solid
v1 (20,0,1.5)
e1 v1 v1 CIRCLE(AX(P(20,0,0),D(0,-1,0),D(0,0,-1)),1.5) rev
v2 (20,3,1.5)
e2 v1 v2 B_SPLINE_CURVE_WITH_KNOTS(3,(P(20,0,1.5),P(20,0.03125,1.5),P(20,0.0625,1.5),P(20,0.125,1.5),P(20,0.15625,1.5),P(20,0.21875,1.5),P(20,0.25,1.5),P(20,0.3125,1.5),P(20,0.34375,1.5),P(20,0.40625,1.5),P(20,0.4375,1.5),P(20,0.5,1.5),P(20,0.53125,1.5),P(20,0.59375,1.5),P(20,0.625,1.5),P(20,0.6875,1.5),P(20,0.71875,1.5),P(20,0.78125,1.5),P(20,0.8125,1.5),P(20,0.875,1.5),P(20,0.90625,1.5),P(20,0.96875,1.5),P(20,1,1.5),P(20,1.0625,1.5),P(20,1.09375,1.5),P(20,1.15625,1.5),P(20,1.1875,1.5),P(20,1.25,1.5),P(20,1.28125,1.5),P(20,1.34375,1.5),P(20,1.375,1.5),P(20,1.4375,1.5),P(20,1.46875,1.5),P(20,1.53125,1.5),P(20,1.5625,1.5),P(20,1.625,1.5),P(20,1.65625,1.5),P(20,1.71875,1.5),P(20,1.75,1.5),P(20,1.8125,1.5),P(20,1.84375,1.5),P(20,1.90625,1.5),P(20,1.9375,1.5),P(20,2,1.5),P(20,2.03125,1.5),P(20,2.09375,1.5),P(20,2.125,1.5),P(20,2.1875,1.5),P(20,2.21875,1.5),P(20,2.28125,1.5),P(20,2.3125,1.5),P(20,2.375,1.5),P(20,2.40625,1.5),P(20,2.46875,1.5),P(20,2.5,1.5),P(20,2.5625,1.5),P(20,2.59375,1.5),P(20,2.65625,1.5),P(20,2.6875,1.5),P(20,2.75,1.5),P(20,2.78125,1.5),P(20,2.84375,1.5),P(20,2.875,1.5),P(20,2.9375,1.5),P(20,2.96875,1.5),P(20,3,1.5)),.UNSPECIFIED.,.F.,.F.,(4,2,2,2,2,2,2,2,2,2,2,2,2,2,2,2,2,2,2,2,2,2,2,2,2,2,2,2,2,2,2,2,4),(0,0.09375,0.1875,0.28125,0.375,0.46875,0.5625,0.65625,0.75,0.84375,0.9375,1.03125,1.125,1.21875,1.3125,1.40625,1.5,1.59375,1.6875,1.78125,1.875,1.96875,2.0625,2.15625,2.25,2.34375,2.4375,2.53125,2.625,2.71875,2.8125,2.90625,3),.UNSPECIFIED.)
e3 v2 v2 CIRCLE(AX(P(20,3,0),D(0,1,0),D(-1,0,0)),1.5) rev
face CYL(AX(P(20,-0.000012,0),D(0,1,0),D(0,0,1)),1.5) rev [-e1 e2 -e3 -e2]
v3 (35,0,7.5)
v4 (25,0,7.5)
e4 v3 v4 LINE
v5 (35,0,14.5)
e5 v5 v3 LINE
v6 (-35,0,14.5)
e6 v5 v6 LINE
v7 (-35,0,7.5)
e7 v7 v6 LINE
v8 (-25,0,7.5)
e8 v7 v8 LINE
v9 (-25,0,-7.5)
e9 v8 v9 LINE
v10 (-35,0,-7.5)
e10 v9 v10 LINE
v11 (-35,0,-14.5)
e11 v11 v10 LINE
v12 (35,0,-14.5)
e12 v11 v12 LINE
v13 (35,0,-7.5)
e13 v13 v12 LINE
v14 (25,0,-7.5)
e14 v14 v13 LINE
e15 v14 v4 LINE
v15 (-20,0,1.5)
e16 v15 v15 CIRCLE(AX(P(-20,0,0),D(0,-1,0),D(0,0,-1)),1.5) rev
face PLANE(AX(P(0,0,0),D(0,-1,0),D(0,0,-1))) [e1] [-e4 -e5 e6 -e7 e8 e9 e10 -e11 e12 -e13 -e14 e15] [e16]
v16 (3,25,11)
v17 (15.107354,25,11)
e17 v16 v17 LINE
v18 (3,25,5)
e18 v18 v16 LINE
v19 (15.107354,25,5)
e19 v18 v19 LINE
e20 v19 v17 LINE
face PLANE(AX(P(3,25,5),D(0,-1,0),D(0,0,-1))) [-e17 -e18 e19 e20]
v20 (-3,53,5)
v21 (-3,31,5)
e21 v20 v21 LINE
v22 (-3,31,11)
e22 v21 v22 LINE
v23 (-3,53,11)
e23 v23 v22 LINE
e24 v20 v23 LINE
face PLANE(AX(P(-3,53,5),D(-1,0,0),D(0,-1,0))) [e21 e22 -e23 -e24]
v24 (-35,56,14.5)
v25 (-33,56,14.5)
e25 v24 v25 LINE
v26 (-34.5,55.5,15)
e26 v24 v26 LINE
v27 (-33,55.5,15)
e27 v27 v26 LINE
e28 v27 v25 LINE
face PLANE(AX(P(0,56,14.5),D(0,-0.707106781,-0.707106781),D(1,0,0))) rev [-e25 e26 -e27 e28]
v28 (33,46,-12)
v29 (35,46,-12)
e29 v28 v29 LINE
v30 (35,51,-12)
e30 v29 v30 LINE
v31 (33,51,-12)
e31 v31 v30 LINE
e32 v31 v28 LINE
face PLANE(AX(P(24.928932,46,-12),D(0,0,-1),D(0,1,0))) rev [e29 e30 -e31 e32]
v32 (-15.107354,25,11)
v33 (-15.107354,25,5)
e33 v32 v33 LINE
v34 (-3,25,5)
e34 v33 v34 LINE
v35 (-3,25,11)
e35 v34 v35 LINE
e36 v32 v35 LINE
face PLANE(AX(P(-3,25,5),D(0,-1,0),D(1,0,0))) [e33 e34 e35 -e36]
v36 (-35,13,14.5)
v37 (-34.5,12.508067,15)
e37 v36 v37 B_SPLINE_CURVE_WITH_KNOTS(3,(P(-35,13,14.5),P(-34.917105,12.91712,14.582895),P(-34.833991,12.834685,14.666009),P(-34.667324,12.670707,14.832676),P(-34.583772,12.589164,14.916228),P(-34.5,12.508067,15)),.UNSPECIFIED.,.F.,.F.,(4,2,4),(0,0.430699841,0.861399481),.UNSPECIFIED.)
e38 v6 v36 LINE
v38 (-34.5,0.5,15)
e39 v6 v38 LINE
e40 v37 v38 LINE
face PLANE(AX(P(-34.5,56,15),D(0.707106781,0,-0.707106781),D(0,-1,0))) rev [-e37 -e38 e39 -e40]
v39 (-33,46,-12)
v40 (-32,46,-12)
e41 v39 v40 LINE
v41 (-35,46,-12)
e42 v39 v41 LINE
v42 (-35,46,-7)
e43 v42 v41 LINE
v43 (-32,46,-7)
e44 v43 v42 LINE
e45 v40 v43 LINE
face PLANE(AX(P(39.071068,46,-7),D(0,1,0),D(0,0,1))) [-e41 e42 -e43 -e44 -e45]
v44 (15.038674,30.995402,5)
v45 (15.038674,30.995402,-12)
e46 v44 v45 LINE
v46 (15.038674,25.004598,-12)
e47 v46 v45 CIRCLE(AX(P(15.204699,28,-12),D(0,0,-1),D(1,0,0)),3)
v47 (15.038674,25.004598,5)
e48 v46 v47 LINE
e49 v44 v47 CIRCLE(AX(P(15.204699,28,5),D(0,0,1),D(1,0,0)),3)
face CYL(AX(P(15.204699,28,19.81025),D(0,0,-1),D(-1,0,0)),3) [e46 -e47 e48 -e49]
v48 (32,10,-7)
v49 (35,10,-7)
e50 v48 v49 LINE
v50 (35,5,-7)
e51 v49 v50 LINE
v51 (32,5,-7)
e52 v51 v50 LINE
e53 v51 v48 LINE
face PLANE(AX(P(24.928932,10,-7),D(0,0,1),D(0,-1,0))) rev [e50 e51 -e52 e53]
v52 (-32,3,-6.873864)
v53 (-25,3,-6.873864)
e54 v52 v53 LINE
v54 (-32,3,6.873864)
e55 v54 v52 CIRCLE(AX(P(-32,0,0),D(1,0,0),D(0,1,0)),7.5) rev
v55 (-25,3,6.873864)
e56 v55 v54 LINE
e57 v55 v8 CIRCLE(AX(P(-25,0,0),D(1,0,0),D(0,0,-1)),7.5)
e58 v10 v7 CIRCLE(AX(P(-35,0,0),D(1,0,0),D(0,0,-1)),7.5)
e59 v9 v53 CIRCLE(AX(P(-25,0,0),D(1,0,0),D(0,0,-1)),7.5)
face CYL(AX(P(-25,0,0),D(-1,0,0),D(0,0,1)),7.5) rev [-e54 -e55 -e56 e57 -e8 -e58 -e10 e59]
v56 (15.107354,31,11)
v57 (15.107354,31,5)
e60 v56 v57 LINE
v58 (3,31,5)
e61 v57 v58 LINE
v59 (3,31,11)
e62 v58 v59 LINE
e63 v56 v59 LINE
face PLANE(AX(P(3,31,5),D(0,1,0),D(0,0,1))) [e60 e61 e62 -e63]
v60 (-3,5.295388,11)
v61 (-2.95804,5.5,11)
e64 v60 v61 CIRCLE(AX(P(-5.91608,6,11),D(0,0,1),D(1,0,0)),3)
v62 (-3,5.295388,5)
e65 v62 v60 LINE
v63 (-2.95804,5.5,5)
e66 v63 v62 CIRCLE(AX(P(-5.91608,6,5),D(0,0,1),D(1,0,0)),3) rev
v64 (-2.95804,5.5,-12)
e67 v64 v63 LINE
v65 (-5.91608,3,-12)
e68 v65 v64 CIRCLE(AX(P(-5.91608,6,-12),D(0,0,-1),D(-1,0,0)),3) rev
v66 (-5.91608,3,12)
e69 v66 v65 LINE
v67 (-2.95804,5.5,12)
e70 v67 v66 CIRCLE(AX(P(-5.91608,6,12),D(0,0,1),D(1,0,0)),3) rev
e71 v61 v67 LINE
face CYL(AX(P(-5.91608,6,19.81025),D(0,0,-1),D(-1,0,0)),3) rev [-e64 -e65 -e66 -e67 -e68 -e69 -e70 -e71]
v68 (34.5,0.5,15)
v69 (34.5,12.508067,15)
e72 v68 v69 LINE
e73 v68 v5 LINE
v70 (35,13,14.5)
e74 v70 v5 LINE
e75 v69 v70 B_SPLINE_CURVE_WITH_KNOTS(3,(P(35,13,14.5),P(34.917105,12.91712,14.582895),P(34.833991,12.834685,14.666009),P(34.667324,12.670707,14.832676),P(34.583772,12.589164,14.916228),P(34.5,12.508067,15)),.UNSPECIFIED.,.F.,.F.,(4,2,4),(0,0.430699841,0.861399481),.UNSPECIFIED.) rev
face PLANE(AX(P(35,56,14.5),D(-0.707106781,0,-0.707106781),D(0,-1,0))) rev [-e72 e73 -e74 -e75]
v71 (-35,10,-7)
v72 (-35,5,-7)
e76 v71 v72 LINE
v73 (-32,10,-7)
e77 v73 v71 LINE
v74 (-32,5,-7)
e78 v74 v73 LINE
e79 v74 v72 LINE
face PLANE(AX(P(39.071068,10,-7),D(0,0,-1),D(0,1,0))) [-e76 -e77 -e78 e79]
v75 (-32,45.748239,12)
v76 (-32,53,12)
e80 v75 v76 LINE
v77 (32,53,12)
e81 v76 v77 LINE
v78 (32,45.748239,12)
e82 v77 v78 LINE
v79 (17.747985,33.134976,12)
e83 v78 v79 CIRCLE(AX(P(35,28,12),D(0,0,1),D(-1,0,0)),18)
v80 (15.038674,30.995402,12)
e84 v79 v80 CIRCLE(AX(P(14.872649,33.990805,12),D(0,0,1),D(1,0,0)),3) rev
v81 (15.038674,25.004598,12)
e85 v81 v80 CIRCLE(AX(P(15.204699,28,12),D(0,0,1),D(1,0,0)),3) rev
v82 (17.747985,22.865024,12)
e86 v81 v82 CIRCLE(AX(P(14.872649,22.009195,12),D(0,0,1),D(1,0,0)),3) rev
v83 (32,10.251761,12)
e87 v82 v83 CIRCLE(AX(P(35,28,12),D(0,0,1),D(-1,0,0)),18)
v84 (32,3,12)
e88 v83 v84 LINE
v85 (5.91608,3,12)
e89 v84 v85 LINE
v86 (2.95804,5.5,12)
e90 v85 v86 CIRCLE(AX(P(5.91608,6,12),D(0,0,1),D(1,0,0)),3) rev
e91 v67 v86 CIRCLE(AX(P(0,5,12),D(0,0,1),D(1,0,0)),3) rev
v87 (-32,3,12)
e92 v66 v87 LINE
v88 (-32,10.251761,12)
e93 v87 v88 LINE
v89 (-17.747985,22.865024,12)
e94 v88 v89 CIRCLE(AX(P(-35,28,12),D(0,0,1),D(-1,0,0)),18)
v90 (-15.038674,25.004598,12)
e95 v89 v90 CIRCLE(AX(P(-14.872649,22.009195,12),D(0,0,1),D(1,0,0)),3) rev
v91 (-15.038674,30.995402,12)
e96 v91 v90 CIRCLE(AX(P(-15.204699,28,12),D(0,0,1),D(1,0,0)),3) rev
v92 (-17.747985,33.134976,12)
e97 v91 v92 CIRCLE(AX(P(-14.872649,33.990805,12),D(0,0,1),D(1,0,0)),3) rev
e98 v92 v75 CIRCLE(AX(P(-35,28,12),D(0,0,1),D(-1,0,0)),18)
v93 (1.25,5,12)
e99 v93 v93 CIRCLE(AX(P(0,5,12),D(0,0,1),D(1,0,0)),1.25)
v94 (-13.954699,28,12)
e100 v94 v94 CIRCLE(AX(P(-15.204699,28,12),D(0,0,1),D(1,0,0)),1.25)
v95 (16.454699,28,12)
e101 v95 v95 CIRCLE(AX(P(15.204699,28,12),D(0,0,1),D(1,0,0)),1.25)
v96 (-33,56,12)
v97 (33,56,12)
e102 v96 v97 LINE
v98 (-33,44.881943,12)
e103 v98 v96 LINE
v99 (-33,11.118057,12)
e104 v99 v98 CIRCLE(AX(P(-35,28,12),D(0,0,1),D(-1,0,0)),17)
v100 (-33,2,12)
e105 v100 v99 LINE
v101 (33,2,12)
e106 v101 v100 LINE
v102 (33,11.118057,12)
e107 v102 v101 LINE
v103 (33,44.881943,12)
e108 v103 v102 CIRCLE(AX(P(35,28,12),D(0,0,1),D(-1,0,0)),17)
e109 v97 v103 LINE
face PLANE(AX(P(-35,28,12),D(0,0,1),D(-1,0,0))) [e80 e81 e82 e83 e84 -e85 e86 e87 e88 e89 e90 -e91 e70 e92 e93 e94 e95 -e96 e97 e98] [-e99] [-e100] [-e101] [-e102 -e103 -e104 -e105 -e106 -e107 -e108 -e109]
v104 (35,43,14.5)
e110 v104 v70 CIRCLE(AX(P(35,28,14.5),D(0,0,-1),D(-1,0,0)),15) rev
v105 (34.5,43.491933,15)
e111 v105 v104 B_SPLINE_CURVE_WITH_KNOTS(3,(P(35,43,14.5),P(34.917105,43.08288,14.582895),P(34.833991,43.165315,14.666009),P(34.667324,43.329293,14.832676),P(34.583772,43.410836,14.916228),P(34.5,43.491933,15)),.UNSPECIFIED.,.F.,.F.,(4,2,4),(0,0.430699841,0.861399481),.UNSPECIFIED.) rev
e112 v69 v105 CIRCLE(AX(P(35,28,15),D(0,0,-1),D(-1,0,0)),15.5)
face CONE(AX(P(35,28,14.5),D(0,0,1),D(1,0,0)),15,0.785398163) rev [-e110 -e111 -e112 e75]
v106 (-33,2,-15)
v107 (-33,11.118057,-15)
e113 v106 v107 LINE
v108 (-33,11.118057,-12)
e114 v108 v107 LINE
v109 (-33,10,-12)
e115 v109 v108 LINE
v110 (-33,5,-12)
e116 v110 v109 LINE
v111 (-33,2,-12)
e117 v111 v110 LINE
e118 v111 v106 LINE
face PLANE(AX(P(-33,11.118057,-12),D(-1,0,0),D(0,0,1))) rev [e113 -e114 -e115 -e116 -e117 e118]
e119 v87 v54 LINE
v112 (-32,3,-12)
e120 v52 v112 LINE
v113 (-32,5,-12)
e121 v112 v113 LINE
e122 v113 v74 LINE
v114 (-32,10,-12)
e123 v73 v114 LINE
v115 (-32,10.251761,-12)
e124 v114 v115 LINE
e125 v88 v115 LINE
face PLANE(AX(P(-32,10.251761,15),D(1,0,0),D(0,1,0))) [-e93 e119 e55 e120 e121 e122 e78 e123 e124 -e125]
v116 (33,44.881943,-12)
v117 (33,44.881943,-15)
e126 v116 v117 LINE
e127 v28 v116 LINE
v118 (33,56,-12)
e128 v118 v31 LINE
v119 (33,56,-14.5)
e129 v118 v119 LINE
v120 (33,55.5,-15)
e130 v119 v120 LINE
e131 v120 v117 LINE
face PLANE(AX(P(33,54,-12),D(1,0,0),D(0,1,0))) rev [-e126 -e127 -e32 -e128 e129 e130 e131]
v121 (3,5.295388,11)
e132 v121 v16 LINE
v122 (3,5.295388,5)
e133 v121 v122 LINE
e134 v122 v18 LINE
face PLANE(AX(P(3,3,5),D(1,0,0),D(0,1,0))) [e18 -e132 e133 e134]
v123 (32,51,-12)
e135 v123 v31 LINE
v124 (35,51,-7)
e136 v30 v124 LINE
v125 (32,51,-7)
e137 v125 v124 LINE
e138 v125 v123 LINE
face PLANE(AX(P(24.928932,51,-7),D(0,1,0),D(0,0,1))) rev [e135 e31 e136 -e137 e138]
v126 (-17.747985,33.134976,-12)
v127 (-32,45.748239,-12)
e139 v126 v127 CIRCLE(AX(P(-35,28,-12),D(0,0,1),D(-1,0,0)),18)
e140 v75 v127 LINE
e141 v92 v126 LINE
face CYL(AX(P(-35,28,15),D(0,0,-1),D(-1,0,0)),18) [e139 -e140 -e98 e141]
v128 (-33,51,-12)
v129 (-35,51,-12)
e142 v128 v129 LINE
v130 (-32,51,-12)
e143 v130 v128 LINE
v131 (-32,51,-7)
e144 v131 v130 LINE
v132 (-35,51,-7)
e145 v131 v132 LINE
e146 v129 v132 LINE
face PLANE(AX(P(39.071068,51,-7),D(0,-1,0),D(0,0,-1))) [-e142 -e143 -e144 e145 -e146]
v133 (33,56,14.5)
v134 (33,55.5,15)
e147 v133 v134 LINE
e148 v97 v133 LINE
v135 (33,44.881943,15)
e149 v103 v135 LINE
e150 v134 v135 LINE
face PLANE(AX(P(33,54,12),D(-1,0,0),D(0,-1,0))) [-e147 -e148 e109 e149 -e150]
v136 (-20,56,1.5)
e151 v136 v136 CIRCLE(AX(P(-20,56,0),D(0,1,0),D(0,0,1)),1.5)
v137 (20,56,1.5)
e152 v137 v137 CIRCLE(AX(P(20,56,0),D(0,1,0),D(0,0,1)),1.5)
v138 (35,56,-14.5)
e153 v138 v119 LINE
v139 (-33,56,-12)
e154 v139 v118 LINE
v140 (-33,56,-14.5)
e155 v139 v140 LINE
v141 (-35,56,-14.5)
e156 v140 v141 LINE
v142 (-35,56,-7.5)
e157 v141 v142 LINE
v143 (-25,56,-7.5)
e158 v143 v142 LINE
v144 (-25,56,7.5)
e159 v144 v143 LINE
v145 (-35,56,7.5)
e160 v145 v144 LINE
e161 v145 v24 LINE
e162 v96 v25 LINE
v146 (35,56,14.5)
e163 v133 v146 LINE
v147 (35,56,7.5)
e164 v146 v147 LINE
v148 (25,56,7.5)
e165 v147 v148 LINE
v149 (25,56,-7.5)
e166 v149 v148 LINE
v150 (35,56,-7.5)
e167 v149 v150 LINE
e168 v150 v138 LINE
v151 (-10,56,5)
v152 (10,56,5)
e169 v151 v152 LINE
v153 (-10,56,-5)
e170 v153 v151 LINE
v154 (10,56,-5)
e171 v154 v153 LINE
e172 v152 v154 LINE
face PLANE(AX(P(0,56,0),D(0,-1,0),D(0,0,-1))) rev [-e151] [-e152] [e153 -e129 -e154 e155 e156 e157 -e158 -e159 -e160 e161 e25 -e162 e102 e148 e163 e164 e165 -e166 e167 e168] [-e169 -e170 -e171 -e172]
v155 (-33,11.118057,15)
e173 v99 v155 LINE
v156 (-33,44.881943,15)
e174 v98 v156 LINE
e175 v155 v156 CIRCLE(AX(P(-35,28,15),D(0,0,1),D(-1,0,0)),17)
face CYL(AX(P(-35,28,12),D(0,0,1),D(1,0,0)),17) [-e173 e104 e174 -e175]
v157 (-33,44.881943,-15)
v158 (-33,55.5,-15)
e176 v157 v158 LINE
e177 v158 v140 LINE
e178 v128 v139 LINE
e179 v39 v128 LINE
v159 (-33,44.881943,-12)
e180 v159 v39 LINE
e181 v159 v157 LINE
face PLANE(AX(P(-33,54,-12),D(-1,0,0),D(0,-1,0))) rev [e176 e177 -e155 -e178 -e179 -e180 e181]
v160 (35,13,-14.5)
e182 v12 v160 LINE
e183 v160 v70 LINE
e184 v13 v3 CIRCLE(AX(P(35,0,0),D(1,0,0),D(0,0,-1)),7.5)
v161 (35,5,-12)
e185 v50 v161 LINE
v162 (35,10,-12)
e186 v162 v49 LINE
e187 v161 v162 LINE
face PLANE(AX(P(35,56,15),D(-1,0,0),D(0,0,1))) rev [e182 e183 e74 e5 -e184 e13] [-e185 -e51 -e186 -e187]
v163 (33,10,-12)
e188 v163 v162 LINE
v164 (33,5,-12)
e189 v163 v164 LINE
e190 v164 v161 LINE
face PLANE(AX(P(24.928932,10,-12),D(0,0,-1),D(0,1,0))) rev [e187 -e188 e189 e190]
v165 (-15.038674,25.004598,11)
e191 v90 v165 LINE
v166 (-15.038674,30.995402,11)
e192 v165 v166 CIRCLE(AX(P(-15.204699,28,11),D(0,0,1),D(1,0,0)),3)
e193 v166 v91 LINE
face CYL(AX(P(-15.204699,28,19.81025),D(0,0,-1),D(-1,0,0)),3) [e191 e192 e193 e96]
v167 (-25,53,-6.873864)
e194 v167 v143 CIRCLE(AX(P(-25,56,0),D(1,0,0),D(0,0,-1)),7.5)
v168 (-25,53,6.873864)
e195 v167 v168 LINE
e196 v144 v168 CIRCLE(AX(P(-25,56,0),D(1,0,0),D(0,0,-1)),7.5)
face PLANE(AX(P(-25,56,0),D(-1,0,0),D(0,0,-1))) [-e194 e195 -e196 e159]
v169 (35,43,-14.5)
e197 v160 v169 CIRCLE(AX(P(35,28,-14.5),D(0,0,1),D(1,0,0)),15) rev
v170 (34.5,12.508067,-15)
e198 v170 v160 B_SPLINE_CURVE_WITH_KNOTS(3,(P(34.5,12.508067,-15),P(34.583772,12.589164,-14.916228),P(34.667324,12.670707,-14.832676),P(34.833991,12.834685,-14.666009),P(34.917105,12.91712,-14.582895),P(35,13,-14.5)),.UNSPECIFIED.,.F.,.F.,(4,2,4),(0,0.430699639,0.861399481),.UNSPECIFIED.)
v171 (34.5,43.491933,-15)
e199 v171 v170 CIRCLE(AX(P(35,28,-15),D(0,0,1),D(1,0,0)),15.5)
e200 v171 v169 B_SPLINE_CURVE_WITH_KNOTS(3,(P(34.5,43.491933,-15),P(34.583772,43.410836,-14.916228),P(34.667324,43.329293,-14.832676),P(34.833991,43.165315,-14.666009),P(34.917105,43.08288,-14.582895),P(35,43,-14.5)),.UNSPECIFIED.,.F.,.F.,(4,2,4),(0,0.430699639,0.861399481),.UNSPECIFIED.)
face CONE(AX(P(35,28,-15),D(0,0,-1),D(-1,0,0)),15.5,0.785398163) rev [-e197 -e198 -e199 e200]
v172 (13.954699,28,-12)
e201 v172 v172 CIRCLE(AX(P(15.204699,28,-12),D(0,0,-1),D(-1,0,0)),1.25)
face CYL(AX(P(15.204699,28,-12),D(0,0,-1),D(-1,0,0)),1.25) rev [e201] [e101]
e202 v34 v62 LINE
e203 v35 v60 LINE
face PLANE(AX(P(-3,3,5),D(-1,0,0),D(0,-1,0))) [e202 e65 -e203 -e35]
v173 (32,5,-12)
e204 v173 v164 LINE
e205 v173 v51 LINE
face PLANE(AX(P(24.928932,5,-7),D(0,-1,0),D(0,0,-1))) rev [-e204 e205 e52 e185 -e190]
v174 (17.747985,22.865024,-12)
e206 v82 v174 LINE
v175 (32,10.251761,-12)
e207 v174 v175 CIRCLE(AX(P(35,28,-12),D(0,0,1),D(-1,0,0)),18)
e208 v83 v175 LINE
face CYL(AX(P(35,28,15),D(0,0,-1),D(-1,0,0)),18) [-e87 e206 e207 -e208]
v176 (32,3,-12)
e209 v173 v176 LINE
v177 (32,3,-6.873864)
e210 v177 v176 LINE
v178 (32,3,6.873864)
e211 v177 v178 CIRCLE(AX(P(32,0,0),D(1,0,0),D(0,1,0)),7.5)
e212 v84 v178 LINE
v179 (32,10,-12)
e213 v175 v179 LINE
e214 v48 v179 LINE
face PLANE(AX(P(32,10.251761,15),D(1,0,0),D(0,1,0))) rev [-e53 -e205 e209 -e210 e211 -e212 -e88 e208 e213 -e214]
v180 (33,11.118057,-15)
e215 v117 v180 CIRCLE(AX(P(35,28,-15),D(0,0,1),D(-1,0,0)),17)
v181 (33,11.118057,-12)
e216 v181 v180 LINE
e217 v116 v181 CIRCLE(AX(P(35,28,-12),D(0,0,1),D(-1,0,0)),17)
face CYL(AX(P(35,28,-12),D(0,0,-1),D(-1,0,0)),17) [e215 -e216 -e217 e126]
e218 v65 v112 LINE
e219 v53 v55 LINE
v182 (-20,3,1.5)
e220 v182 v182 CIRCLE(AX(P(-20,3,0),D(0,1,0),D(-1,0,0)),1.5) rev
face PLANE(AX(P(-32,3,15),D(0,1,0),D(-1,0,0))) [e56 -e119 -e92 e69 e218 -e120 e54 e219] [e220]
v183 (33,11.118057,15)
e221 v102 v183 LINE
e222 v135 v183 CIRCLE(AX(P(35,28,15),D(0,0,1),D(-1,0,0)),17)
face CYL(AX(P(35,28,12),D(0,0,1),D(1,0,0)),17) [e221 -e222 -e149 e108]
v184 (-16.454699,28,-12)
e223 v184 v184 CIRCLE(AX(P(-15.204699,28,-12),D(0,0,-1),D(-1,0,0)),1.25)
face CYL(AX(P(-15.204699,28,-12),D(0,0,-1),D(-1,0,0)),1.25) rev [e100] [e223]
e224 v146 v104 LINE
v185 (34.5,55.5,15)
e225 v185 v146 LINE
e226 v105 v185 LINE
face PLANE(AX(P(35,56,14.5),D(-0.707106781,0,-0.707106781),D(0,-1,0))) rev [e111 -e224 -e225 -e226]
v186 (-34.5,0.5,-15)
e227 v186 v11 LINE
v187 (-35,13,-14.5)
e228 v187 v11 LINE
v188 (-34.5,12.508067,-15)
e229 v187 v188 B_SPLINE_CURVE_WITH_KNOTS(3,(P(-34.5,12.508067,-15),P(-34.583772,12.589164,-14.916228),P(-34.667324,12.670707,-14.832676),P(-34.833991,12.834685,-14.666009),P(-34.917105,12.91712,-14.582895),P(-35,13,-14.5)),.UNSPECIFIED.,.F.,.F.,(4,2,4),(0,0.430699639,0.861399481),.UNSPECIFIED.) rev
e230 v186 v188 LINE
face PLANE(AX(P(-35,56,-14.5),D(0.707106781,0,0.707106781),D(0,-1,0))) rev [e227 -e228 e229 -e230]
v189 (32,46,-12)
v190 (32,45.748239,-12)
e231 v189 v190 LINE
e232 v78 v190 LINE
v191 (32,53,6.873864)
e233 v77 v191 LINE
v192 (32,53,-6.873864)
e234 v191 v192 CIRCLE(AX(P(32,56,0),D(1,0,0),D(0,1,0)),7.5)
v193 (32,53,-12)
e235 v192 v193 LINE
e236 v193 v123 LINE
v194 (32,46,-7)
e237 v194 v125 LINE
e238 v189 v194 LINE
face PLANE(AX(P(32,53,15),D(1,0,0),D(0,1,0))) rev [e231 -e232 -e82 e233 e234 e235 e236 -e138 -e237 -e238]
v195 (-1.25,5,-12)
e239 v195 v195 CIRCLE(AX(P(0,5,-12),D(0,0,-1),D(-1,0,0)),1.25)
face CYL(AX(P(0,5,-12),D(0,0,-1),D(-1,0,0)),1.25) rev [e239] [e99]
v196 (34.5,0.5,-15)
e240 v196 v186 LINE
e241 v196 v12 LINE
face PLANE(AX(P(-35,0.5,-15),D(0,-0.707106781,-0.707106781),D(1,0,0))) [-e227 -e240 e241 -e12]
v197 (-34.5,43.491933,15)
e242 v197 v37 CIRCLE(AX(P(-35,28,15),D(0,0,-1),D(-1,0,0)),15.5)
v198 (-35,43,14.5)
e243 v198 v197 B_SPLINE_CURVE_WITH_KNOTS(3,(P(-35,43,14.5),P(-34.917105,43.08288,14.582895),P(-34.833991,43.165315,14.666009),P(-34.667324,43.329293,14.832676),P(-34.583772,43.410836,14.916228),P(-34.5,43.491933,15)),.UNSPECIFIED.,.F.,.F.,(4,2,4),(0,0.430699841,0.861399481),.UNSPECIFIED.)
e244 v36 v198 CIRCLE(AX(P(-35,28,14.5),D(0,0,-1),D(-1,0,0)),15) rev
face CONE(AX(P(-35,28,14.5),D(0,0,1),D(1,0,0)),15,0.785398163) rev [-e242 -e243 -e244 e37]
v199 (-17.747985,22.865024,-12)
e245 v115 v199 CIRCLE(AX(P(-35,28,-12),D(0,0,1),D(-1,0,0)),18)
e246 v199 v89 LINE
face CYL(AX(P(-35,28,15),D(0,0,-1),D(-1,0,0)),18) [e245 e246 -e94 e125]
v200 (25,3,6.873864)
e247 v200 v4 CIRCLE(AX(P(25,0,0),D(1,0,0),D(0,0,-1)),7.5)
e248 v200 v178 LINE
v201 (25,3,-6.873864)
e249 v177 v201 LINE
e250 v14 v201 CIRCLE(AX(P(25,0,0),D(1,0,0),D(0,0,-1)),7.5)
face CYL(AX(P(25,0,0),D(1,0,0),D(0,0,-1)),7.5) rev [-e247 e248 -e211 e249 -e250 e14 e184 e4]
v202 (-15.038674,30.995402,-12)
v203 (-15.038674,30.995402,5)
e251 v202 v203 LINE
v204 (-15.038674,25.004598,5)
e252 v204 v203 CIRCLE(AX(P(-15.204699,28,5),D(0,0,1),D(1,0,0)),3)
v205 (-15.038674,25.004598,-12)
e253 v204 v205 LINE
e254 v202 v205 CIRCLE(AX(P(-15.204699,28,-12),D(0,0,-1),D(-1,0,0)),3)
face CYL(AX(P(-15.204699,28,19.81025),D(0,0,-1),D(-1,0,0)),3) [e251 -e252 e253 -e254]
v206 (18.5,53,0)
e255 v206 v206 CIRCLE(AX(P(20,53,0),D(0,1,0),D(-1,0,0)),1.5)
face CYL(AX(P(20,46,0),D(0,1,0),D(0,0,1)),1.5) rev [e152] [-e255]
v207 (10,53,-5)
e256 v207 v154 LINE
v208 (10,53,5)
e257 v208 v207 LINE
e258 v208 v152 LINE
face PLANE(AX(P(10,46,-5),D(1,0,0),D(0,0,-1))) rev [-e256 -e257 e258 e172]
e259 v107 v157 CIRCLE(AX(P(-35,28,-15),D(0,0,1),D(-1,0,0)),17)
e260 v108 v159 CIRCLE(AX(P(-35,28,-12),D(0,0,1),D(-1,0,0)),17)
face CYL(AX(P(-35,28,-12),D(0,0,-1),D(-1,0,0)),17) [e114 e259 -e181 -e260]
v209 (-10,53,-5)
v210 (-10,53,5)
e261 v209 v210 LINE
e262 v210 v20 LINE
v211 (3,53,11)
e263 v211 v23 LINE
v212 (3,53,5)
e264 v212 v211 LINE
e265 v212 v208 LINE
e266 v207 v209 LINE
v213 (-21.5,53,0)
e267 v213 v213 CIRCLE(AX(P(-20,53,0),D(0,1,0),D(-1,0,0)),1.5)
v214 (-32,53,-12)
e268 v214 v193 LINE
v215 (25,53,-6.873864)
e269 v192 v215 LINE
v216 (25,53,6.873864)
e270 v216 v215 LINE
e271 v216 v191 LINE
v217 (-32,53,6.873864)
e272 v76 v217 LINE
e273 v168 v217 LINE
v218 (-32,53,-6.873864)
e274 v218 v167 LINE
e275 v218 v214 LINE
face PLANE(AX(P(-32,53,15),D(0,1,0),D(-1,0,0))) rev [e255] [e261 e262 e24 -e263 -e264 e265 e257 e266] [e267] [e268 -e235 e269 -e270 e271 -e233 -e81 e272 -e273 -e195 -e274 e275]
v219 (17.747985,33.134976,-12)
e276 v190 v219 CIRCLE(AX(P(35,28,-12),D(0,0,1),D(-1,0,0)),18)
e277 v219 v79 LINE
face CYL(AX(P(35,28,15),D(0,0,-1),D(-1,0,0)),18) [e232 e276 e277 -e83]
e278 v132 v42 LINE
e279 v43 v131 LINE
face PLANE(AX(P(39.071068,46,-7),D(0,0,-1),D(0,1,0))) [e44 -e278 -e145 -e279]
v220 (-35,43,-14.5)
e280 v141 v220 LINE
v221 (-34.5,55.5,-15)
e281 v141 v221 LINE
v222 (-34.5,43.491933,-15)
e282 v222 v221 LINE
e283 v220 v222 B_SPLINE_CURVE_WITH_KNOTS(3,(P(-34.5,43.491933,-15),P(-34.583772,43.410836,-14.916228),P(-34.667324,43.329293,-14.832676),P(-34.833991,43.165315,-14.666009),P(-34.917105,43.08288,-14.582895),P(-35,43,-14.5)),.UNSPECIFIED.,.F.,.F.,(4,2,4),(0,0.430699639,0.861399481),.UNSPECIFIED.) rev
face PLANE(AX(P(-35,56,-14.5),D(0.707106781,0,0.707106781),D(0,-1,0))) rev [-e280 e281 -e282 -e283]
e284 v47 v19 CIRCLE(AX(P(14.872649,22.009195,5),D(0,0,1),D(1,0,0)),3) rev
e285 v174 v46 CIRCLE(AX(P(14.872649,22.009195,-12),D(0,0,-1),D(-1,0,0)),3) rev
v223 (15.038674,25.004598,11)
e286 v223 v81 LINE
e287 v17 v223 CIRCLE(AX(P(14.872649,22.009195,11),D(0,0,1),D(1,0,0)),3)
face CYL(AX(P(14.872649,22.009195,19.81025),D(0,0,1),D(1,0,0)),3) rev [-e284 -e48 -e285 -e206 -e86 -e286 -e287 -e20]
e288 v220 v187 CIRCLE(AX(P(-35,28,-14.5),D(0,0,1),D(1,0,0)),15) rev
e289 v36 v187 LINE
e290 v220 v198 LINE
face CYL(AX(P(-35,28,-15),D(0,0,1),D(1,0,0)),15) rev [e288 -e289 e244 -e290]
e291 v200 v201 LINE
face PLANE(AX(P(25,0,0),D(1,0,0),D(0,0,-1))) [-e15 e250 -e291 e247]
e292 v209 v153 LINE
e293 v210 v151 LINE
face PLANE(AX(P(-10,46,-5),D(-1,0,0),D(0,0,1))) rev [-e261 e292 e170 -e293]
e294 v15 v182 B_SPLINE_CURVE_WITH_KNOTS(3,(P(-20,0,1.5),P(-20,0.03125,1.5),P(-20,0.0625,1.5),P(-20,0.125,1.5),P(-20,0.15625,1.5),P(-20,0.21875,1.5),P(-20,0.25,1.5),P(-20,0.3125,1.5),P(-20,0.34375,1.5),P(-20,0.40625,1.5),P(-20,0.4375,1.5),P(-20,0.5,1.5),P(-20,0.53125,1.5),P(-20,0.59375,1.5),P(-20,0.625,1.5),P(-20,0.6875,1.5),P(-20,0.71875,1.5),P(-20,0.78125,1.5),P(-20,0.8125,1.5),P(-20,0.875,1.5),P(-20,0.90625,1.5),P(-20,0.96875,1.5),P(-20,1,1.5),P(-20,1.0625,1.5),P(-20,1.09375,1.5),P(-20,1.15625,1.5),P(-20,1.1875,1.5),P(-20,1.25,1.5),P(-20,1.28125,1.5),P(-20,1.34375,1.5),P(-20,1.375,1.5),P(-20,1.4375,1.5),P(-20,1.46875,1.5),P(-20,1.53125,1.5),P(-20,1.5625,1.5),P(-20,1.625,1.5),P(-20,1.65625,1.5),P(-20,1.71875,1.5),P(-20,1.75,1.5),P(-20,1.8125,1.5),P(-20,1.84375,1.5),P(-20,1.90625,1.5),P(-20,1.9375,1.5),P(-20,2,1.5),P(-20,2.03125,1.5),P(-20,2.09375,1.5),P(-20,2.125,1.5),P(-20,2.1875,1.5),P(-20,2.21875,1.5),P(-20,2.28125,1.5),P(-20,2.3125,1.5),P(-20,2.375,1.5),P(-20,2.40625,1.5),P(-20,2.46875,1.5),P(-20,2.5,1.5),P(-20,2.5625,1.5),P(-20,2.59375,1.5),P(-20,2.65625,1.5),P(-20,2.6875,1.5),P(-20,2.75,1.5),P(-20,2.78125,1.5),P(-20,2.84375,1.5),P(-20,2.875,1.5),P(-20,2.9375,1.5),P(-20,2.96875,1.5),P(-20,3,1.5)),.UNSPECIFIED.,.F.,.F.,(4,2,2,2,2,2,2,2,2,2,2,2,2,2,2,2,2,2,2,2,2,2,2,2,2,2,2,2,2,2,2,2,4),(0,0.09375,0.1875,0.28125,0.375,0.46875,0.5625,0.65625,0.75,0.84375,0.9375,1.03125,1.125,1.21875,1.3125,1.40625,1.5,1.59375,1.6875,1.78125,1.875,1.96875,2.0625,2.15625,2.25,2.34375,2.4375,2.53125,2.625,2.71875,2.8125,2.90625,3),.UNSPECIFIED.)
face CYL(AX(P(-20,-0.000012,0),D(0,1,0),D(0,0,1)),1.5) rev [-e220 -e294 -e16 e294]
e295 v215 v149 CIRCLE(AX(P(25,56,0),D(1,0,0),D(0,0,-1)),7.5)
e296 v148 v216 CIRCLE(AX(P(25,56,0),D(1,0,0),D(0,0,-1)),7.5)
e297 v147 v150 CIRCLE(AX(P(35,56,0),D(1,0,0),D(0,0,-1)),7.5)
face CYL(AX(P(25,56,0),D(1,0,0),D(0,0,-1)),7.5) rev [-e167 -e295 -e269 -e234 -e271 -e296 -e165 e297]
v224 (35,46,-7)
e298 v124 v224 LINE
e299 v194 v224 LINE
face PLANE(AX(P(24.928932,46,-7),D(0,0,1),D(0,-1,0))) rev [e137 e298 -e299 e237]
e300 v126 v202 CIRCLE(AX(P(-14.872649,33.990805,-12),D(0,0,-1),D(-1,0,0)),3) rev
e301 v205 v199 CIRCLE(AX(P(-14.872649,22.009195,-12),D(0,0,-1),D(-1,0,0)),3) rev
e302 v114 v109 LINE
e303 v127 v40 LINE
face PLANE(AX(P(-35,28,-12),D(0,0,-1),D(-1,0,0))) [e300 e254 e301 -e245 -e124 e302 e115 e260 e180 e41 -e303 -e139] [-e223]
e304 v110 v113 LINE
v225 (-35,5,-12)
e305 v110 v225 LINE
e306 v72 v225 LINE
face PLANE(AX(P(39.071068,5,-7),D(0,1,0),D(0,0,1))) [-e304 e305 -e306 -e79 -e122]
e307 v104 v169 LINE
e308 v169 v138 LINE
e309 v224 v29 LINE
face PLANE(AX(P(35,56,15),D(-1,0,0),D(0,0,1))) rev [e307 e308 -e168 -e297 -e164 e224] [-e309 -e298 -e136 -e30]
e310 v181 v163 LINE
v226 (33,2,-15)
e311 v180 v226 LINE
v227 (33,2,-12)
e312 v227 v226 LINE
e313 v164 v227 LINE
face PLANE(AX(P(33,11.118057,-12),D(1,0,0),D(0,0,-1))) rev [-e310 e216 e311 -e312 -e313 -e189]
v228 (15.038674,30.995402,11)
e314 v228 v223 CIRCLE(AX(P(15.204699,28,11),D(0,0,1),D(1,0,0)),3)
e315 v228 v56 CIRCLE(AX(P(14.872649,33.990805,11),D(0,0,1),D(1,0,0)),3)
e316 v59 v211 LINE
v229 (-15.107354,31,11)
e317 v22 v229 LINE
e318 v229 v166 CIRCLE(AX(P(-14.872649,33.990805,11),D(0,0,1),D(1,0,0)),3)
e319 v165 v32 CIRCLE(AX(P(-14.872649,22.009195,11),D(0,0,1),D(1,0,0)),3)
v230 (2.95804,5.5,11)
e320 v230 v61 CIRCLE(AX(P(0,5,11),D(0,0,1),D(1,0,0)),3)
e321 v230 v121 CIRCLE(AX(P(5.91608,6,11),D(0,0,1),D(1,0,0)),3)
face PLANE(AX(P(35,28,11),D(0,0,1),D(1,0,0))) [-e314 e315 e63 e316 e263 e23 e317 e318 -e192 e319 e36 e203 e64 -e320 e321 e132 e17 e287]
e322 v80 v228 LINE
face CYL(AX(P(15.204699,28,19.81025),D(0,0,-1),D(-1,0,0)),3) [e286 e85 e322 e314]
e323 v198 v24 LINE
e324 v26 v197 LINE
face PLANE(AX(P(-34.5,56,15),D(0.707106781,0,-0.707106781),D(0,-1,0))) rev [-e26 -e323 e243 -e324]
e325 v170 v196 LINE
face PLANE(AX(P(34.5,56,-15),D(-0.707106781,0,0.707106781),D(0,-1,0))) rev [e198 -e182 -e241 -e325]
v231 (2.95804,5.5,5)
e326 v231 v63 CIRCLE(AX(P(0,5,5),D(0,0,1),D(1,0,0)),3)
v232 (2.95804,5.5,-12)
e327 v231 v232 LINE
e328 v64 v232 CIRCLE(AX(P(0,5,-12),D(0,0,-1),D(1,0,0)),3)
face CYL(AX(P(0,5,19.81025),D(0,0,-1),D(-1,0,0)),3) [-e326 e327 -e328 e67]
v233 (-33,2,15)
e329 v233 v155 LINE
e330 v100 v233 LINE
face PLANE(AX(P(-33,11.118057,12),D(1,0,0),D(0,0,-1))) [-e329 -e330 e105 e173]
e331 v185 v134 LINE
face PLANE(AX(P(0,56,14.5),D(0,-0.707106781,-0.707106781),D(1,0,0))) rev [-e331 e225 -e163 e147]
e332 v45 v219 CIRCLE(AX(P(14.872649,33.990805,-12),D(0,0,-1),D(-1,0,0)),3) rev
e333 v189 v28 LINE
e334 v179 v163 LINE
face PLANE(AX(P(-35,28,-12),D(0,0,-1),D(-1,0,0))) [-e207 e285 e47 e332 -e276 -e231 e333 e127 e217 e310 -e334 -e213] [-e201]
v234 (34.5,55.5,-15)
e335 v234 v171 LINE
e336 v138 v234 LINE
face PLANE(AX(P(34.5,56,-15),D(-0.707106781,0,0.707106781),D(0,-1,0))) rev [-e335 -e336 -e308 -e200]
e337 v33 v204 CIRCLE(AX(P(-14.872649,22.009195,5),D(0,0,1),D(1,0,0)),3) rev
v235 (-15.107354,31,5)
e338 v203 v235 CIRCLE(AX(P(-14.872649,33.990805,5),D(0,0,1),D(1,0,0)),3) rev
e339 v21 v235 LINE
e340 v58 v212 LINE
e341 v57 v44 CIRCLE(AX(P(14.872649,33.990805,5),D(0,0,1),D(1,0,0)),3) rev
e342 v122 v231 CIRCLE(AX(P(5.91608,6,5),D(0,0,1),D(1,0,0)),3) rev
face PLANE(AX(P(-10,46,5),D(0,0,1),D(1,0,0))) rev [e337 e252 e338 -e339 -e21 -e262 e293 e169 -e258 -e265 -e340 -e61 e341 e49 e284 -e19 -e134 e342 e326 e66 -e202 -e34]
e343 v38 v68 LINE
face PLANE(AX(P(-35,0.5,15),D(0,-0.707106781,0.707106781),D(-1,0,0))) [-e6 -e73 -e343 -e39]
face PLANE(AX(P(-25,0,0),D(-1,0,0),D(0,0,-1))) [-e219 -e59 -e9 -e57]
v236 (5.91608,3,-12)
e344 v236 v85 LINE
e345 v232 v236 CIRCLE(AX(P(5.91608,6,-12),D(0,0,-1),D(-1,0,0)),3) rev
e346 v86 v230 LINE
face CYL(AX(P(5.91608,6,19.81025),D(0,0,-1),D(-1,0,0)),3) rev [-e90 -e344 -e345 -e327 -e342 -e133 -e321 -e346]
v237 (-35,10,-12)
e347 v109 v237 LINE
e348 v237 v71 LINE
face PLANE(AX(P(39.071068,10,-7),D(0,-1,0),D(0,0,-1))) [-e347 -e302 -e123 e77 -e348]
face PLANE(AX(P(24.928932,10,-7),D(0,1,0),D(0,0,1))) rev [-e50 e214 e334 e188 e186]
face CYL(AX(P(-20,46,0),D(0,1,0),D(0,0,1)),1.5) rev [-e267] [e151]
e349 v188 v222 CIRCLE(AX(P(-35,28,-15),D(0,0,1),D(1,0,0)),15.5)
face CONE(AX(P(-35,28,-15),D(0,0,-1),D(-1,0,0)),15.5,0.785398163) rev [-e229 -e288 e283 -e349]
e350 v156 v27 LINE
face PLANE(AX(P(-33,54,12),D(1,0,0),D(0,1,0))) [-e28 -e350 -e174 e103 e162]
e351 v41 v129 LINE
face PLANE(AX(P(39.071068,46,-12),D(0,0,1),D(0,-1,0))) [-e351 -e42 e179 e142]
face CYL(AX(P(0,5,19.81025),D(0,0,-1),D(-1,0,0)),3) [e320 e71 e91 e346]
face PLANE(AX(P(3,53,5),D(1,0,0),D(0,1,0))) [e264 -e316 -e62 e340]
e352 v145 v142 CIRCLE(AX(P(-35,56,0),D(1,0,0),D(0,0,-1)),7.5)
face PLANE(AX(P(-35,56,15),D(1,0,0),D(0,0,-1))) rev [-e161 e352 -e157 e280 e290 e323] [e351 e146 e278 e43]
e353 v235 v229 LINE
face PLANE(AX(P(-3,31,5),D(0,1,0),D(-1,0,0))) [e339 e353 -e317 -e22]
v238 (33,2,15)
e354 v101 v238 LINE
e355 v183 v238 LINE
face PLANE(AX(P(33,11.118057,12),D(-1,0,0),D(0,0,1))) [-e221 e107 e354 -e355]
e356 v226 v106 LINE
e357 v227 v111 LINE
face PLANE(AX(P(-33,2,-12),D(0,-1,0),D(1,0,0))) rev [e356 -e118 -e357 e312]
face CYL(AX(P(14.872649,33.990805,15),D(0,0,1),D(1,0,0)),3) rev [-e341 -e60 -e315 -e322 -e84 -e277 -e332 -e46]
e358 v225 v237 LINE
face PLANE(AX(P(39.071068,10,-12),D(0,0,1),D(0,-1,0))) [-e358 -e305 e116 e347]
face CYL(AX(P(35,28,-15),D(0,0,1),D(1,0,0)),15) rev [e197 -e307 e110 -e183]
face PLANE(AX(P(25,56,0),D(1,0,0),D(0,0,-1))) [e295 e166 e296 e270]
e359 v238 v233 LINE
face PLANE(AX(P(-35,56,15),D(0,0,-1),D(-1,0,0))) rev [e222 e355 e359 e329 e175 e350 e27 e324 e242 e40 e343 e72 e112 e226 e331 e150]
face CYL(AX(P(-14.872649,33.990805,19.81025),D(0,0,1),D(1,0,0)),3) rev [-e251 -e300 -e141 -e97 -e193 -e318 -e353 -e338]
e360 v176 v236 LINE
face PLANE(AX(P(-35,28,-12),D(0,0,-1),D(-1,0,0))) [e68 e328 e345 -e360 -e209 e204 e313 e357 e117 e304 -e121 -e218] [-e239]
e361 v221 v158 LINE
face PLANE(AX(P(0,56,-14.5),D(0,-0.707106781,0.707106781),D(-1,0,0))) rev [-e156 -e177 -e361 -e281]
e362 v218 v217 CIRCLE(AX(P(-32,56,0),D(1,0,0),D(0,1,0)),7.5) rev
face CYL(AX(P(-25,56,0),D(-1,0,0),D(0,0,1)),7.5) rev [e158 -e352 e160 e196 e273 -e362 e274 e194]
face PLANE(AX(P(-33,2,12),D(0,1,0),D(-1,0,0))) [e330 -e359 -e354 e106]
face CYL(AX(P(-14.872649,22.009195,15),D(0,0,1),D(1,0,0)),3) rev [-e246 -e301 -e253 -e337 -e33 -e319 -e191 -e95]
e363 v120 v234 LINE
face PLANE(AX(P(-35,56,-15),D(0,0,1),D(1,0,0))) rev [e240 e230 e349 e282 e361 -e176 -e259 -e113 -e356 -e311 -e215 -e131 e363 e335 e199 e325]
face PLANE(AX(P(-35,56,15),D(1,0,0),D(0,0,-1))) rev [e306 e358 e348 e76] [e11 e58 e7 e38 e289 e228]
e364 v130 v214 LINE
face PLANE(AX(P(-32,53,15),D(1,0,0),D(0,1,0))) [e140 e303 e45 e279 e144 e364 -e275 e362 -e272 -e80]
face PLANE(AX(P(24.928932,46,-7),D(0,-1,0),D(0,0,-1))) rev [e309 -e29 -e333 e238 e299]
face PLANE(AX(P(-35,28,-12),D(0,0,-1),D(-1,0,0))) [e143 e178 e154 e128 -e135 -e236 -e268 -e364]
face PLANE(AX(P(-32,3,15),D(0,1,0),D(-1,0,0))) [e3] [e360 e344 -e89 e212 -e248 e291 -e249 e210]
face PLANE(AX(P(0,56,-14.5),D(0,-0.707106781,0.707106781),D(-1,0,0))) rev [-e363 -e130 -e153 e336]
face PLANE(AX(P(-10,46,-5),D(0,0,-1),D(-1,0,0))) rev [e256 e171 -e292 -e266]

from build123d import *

# Parameters (mm, degrees)
SKETCH1_W                   = 70
SKETCH1_H                   = 30
BOSS_EXTRUDE1_DEPTH         = 56
CUT_EXTRUDE1_DEPTH          = 73.532751223
CUT_EXTRUDE2_DEPTH          = 68.720011813
CUT_EXTRUDE2_DEPTH_BACK     = 5
SKETCH3_R                   = 1.5
SKETCH4_R                   = 7.5
CUT_EXTRUDE5_DEPTH          = 10
SKETCH6_R                   = 15
CUT_EXTRUDE7_DEPTH          = 73.532751223
SKETCH7_W                   = 20
SKETCH7_H                   = 10
CUT_EXTRUDE8_DEPTH          = 10
CUT_EXTRUDE10_START         = -10
SKETCH8_R                   = 1.5
CUT_EXTRUDE10_DEPTH         = 10
CUT_EXTRUDE11_DEPTH         = 3
BOSS_EXTRUDE2_START         = -10
BOSS_EXTRUDE2_DEPTH         = 6
CHAMFER1_SIZE               = 0.5
CHAMFER2_SIZE               = 0.5
SKETCH10_W                  = 66
SKETCH10_H                  = 2
CUT_EXTRUDE13_DEPTH         = 3
CUT_EXTRUDE14_START         = -3
SKETCH12_W                  = 5
SKETCH12_H                  = 5
CUT_EXTRUDE14_DEPTH         = 3
BOSS_EXTRUDE3_START         = -24
BOSS_EXTRUDE3_DEPTH         = 24
TAP_DRILL_FOR_M3X0_5_TAP1_D = 2.5
FILLET1_R                   = 3


with BuildPart() as part:
    # Sketch1 → Boss-Extrude1 (new body)
    with BuildSketch(Plane(origin=(0, 0, 0), x_dir=(1, 0, 0), z_dir=(0, 1, 0))):
        Rectangle(SKETCH1_W, SKETCH1_H)
    extrude(amount=BOSS_EXTRUDE1_DEPTH)

    # Sketch2 → Cut-Extrude1 (cut, through all)
    with BuildSketch(Plane(origin=(0, 0, -15), x_dir=(-1, 0, 0), z_dir=(0, 0, -1))):
        with BuildLine():
            Line((32, 53), (-32, 53))
            Line((-32, 53), (-32, 45.748239349))
            ThreePointArc((-32, 45.748239349), (-17, 28), (-32, 10.251760651))
            Line((-32, 10.251760651), (-32, 3))
            Line((-32, 3), (32, 3))
            Line((32, 3), (32, 10.251760651))
            ThreePointArc((32, 10.251760651), (17, 28), (32, 45.748239349))
            Line((32, 45.748239349), (32, 53))
        make_face()
    extrude(amount=-CUT_EXTRUDE1_DEPTH, mode=Mode.SUBTRACT)

    # Sketch3 → Cut-Extrude2 (cut, two sides: drawn at the far end of the back side and taken through both)
    with BuildSketch(Plane.XZ.offset(-CUT_EXTRUDE2_DEPTH_BACK)):
        with Locations(Location((20, 0, 0), (0, 0, 90))):
            Circle(SKETCH3_R)
        with Locations(Location((-20, 0, 0), (0, 0, 90))):
            Circle(SKETCH3_R)
    extrude(amount=CUT_EXTRUDE2_DEPTH + CUT_EXTRUDE2_DEPTH_BACK, mode=Mode.SUBTRACT)

    # Sketch4 → Cut-Extrude5 (cut)
    with BuildSketch(Plane(origin=(35, 0, 0), x_dir=(0, 0, -1), z_dir=(1, 0, 0))):
        with Locations((0, 56)):
            Circle(SKETCH4_R)
        Circle(SKETCH4_R)
    cut_extrude5 = extrude(amount=-CUT_EXTRUDE5_DEPTH, mode=Mode.SUBTRACT)

    # Sketch6 → Cut-Extrude7 (cut, through all)
    with BuildSketch(Plane.XY.offset(15)):
        with Locations((-35, 28)):
            Circle(SKETCH6_R)
        with Locations((35, 28)):
            Circle(SKETCH6_R)
    extrude(amount=-CUT_EXTRUDE7_DEPTH, mode=Mode.SUBTRACT)

    # Sketch7 → Cut-Extrude8 (cut)
    with BuildSketch(Plane(origin=(0, 56, 0), x_dir=(1, 0, 0), z_dir=(0, 1, 0))):
        Rectangle(SKETCH7_W, SKETCH7_H)
    extrude(amount=-CUT_EXTRUDE8_DEPTH, mode=Mode.SUBTRACT)

    # Sketch8 → Cut-Extrude10 (cut)
    with BuildSketch(Plane(origin=(0, 56, 0), x_dir=(1, 0, 0), z_dir=(0, 1, 0)).offset(CUT_EXTRUDE10_START)):
        with Locations(Location((20, 0, 0), (0, 0, 270))):
            Circle(SKETCH8_R)
        with Locations(Location((-20, 0, 0), (0, 0, 270))):
            Circle(SKETCH8_R)
    extrude(amount=CUT_EXTRUDE10_DEPTH, mode=Mode.SUBTRACT)

    # Sketch2<3> → Cut-Extrude11 (cut)
    with BuildSketch(Plane(origin=(0, 0, -15), x_dir=(-1, 0, 0), z_dir=(0, 0, -1))):
        with BuildLine():
            Line((-33, 54), (-33, 44.881943016))
            ThreePointArc((-33, 44.881943016), (-18, 28), (-33, 11.118056984))
            Line((-33, 11.118056984), (-33, 2))
            Line((-33, 2), (33, 2))
            Line((33, 2), (33, 11.118056984))
            ThreePointArc((33, 11.118056984), (18, 28), (33, 44.881943016))
            Line((33, 44.881943016), (33, 54))
            Line((33, 54), (-33, 54))
        make_face()
        with BuildLine():
            Line((32, 53), (-32, 53))
            Line((-32, 53), (-32, 45.748239349))
            ThreePointArc((-32, 45.748239349), (-17, 28), (-32, 10.251760651))
            Line((-32, 10.251760651), (-32, 3))
            Line((-32, 3), (32, 3))
            Line((32, 3), (32, 10.251760651))
            ThreePointArc((32, 10.251760651), (17, 28), (32, 45.748239349))
            Line((32, 45.748239349), (32, 53))
        make_face(mode=Mode.SUBTRACT)
    cut_extrude11 = extrude(amount=-CUT_EXTRUDE11_DEPTH, mode=Mode.SUBTRACT)

    # Sketch11 → Boss-Extrude2 (add)
    with BuildSketch(Plane.XY.offset(15).offset(BOSS_EXTRUDE2_START)):
        with BuildLine():
            Line((-3, 3), (3, 3))
            Line((3, 3), (3, 25))
            Line((3, 25), (17.251760651, 25))
            ThreePointArc((17.251760651, 25), (17, 28), (17.251760651, 31))
            Line((17.251760651, 31), (3, 31))
            Line((3, 31), (3, 53))
            Line((3, 53), (-3, 53))
            Line((-3, 53), (-3, 31))
            Line((-3, 31), (-17.251760651, 31))
            ThreePointArc((-17.251760651, 31), (-17, 28), (-17.251760651, 25))
            Line((-17.251760651, 25), (-3, 25))
            Line((-3, 25), (-3, 3))
        make_face()
    extrude(amount=BOSS_EXTRUDE2_DEPTH)

    # Chamfer1
    chamfer1_edges = [part.edges().sort_by_distance(p)[0] for p in [
        (0, 56, 15),
        (32, 6.625880325, 15),
        (32, 49.374119675, 15),
        (0, 53, 15),
        (-32, 49.374119675, 15),
        (-17, 28, 15),
        (-32, 6.625880325, 15),
        (0, 3, 15),
        (17, 28, 15),
        (0, 0, 15),
        (35, 49.5, 15),
        (-35, 49.5, 15),
        (-35, 6.5, 15),
        (35, 6.5, 15),
        (-20, 28, 15),
        (20, 28, 15),
    ]]
    chamfer(chamfer1_edges, length=CHAMFER1_SIZE)

    # Chamfer2
    chamfer2_edges = [part.edges().sort_by_distance(p)[0] for p in [
        (0, 0, -15),
        (0, 56, -15),
        (-35, 49.5, -15),
        (35, 49.5, -15),
        (-35, 6.5, -15),
        (35, 6.5, -15),
        (-20, 28, -15),
        (20, 28, -15),
    ]]
    chamfer(chamfer2_edges, length=CHAMFER2_SIZE)

    # Sketch10 → Cut-Extrude13 (cut)
    with BuildSketch(Plane(origin=(0, 0, -15), x_dir=(-1, 0, 0), z_dir=(0, 0, -1))):
        with Locations((0, 55)):
            Rectangle(SKETCH10_W, SKETCH10_H)
    cut_extrude13 = extrude(amount=-CUT_EXTRUDE13_DEPTH, mode=Mode.SUBTRACT)

    # Mirror2: Cut-Extrude11, Cut-Extrude13 across plane
    add(cut_extrude11.mirror(Plane.XY), mode=Mode.SUBTRACT)
    add(cut_extrude13.mirror(Plane.XY), mode=Mode.SUBTRACT)

    # Sketch12 → Cut-Extrude14 (cut)
    with BuildSketch(Plane(origin=(35, 0, 0), x_dir=(0, 0, -1), z_dir=(1, 0, 0)).offset(CUT_EXTRUDE14_START)):
        with Locations((9.5, 7.5)):
            Rectangle(SKETCH12_W, SKETCH12_H)
        with Locations((9.5, 48.5)):
            Rectangle(SKETCH12_W, SKETCH12_H)
    cut_extrude14 = extrude(amount=CUT_EXTRUDE14_DEPTH, mode=Mode.SUBTRACT)

    # Mirror3: Cut-Extrude14 across plane
    add(cut_extrude14.mirror(Plane(origin=(0, 0, 0), x_dir=(0, 0, 1), z_dir=(1, 0, 0))), mode=Mode.SUBTRACT)

    # Mirror4: Cut-Extrude5 across plane
    add(cut_extrude5.mirror(Plane(origin=(0, 0, 0), x_dir=(0, 0, 1), z_dir=(1, 0, 0))), mode=Mode.SUBTRACT)

    # Sketch13 → Boss-Extrude3 (add)
    with BuildSketch(Plane(origin=(0, 0, -12), x_dir=(-1, 0, 0), z_dir=(0, 0, -1)).offset(BOSS_EXTRUDE3_START)):
        with BuildLine():
            Line((-2.236067977, 3), (2.236067977, 3))
            ThreePointArc((2.236067977, 3), (0, 8), (-2.236067977, 3))
        make_face()
        with BuildLine():
            ThreePointArc((-17.145915815, 30.287286146), (-12.204699164, 28), (-17.145915815, 25.712713854))
            ThreePointArc((-17.145915815, 25.712713854), (-17.001640796, 28), (-17.145915815, 30.287286146))
        make_face()
        with BuildLine():
            ThreePointArc((17.145915815, 30.287286146), (17.001640796, 28), (17.145915815, 25.712713854))
            ThreePointArc((17.145915815, 25.712713854), (12.204699164, 28), (17.145915815, 30.287286146))
        make_face()
    extrude(amount=BOSS_EXTRUDE3_DEPTH)

    # Tap Drill for M3x0.5 Tap1 (through all)
    with Locations(Plane(origin=(0, 0, -12), x_dir=(-1, 0, 0), z_dir=(0, 0, -1))):
        with Locations((-15.204699164, 28), (15.204699164, 28), (0, 5)):
            Hole(TAP_DRILL_FOR_M3X0_5_TAP1_D / 2)

    # Fillet1
    # the kernel refuses this fillet: 3 mm, written as the material it adds along each edge
    with BuildSketch(Plane(origin=(-17.145915815, 25.712713854, 12.276598744), x_dir=(-0.2068511279508174, -0.9783724295305314, 0), z_dir=(0, 0, -1))) as fillet1_piece_1_section:
        with BuildLine():
            CenterArc((3.153192789, -2.990178573), FILLET1_R, 94.637488492, 70.252161629)
            ThreePointArc((0.256916116, -2.208141853), (0.340537511, -1.079395596), (0, 0))
            ThreePointArc((0, 0), (1.455319749, -0.05892856), (2.910639498, 0))
        make_face()
    fillet1_piece_1 = extrude(amount=24.276598744, mode=Mode.PRIVATE)
    fillet1_piece_1 = split(fillet1_piece_1, bisect_by=Plane(origin=(-16.806719859, 24.740087729, 12), z_dir=(0, 0, -1)), keep=Keep.TOP, mode=Mode.PRIVATE)
    add(fillet1_piece_1)
    with BuildSketch(Plane(origin=(-17.145915815, 30.287286146, 12.276598744), x_dir=(-0.2068511279508151, 0.9783724295305319, 0), z_dir=(0, 0, -1))) as fillet1_piece_2_section:
        with BuildLine():
            CenterArc((3.153192789, 2.990178573), FILLET1_R, 195.110349879, 70.252161629)
            ThreePointArc((0.256916116, 2.208141853), (0.340537511, 1.079395596), (0, 0))
            ThreePointArc((0, 0), (1.455319749, 0.05892856), (2.910639498, 0))
        make_face()
    fillet1_piece_2 = extrude(amount=24.276598744, mode=Mode.PRIVATE)
    fillet1_piece_2 = split(fillet1_piece_2, bisect_by=Plane(origin=(-16.806719859, 31.259912271, 12), z_dir=(0, 0, -1)), keep=Keep.TOP, mode=Mode.PRIVATE)
    add(fillet1_piece_2)
    with BuildSketch(Plane(origin=(-2.236067977, 3, 14.200029514), x_dir=(-1, 0, 0), z_dir=(0, 0, -1))) as fillet1_piece_3_section:
        with BuildLine():
            CenterArc((3.680011806, 3), FILLET1_R, 189.594068227, 80.405931773)
            ThreePointArc((0.721971914, 2.5), (0.646151504, 1.167647394), (0, 0))
            Line((0, 0), (3.680011806, 0))
        make_face()
    fillet1_piece_3 = extrude(amount=26.200029514, mode=Mode.PRIVATE)
    fillet1_piece_3 = split(fillet1_piece_3, bisect_by=Plane(origin=(-3.476904083, 3.561012675, 12), z_dir=(0, 0, -1)), keep=Keep.TOP, mode=Mode.PRIVATE)
    add(fillet1_piece_3)
    with BuildSketch(Plane(origin=(2.236067977, 3, 14.200029514), x_dir=(1, 0, 0), z_dir=(0, 0, -1))) as fillet1_piece_4_section:
        with BuildLine():
            CenterArc((3.680011806, -3), FILLET1_R, 90, 80.405931773)
            ThreePointArc((0.721971914, -2.5), (0.646151504, -1.167647394), (0, 0))
            Line((0, 0), (3.680011806, 0))
        make_face()
    fillet1_piece_4 = extrude(amount=26.200029514, mode=Mode.PRIVATE)
    fillet1_piece_4 = split(fillet1_piece_4, bisect_by=Plane(origin=(3.476904083, 3.561012675, 12), z_dir=(0, 0, -1)), keep=Keep.TOP, mode=Mode.PRIVATE)
    add(fillet1_piece_4)
    with BuildSketch(Plane(origin=(17.145915815, 30.287286146, 12.276598744), x_dir=(0.20685112795081617, 0.9783724295305316, 0), z_dir=(0, 0, -1))) as fillet1_piece_5_section:
        with BuildLine():
            CenterArc((3.153192789, -2.990178573), FILLET1_R, 94.637488492, 70.252161629)
            ThreePointArc((0.256916116, -2.208141853), (0.340537511, -1.079395596), (0, 0))
            ThreePointArc((0, 0), (1.455319749, -0.05892856), (2.910639498, 0))
        make_face()
    fillet1_piece_5 = extrude(amount=24.276598744, mode=Mode.PRIVATE)
    fillet1_piece_5 = split(fillet1_piece_5, bisect_by=Plane(origin=(16.806719859, 31.259912271, 12), z_dir=(0, 0, -1)), keep=Keep.TOP, mode=Mode.PRIVATE)
    add(fillet1_piece_5)
    with BuildSketch(Plane(origin=(17.145915815, 25.712713854, 12.276598744), x_dir=(0.20685112795081684, -0.9783724295305316, 0), z_dir=(0, 0, -1))) as fillet1_piece_6_section:
        with BuildLine():
            CenterArc((3.153192789, 2.990178573), FILLET1_R, 195.110349879, 70.252161629)
            ThreePointArc((0.256916116, 2.208141853), (0.340537511, 1.079395596), (0, 0))
            ThreePointArc((0, 0), (1.455319749, 0.05892856), (2.910639498, 0))
        make_face()
    fillet1_piece_6 = extrude(amount=24.276598744, mode=Mode.PRIVATE)
    fillet1_piece_6 = split(fillet1_piece_6, bisect_by=Plane(origin=(16.806719859, 24.740087729, 12), z_dir=(0, 0, -1)), keep=Keep.TOP, mode=Mode.PRIVATE)
    add(fillet1_piece_6)


solid = part.part
